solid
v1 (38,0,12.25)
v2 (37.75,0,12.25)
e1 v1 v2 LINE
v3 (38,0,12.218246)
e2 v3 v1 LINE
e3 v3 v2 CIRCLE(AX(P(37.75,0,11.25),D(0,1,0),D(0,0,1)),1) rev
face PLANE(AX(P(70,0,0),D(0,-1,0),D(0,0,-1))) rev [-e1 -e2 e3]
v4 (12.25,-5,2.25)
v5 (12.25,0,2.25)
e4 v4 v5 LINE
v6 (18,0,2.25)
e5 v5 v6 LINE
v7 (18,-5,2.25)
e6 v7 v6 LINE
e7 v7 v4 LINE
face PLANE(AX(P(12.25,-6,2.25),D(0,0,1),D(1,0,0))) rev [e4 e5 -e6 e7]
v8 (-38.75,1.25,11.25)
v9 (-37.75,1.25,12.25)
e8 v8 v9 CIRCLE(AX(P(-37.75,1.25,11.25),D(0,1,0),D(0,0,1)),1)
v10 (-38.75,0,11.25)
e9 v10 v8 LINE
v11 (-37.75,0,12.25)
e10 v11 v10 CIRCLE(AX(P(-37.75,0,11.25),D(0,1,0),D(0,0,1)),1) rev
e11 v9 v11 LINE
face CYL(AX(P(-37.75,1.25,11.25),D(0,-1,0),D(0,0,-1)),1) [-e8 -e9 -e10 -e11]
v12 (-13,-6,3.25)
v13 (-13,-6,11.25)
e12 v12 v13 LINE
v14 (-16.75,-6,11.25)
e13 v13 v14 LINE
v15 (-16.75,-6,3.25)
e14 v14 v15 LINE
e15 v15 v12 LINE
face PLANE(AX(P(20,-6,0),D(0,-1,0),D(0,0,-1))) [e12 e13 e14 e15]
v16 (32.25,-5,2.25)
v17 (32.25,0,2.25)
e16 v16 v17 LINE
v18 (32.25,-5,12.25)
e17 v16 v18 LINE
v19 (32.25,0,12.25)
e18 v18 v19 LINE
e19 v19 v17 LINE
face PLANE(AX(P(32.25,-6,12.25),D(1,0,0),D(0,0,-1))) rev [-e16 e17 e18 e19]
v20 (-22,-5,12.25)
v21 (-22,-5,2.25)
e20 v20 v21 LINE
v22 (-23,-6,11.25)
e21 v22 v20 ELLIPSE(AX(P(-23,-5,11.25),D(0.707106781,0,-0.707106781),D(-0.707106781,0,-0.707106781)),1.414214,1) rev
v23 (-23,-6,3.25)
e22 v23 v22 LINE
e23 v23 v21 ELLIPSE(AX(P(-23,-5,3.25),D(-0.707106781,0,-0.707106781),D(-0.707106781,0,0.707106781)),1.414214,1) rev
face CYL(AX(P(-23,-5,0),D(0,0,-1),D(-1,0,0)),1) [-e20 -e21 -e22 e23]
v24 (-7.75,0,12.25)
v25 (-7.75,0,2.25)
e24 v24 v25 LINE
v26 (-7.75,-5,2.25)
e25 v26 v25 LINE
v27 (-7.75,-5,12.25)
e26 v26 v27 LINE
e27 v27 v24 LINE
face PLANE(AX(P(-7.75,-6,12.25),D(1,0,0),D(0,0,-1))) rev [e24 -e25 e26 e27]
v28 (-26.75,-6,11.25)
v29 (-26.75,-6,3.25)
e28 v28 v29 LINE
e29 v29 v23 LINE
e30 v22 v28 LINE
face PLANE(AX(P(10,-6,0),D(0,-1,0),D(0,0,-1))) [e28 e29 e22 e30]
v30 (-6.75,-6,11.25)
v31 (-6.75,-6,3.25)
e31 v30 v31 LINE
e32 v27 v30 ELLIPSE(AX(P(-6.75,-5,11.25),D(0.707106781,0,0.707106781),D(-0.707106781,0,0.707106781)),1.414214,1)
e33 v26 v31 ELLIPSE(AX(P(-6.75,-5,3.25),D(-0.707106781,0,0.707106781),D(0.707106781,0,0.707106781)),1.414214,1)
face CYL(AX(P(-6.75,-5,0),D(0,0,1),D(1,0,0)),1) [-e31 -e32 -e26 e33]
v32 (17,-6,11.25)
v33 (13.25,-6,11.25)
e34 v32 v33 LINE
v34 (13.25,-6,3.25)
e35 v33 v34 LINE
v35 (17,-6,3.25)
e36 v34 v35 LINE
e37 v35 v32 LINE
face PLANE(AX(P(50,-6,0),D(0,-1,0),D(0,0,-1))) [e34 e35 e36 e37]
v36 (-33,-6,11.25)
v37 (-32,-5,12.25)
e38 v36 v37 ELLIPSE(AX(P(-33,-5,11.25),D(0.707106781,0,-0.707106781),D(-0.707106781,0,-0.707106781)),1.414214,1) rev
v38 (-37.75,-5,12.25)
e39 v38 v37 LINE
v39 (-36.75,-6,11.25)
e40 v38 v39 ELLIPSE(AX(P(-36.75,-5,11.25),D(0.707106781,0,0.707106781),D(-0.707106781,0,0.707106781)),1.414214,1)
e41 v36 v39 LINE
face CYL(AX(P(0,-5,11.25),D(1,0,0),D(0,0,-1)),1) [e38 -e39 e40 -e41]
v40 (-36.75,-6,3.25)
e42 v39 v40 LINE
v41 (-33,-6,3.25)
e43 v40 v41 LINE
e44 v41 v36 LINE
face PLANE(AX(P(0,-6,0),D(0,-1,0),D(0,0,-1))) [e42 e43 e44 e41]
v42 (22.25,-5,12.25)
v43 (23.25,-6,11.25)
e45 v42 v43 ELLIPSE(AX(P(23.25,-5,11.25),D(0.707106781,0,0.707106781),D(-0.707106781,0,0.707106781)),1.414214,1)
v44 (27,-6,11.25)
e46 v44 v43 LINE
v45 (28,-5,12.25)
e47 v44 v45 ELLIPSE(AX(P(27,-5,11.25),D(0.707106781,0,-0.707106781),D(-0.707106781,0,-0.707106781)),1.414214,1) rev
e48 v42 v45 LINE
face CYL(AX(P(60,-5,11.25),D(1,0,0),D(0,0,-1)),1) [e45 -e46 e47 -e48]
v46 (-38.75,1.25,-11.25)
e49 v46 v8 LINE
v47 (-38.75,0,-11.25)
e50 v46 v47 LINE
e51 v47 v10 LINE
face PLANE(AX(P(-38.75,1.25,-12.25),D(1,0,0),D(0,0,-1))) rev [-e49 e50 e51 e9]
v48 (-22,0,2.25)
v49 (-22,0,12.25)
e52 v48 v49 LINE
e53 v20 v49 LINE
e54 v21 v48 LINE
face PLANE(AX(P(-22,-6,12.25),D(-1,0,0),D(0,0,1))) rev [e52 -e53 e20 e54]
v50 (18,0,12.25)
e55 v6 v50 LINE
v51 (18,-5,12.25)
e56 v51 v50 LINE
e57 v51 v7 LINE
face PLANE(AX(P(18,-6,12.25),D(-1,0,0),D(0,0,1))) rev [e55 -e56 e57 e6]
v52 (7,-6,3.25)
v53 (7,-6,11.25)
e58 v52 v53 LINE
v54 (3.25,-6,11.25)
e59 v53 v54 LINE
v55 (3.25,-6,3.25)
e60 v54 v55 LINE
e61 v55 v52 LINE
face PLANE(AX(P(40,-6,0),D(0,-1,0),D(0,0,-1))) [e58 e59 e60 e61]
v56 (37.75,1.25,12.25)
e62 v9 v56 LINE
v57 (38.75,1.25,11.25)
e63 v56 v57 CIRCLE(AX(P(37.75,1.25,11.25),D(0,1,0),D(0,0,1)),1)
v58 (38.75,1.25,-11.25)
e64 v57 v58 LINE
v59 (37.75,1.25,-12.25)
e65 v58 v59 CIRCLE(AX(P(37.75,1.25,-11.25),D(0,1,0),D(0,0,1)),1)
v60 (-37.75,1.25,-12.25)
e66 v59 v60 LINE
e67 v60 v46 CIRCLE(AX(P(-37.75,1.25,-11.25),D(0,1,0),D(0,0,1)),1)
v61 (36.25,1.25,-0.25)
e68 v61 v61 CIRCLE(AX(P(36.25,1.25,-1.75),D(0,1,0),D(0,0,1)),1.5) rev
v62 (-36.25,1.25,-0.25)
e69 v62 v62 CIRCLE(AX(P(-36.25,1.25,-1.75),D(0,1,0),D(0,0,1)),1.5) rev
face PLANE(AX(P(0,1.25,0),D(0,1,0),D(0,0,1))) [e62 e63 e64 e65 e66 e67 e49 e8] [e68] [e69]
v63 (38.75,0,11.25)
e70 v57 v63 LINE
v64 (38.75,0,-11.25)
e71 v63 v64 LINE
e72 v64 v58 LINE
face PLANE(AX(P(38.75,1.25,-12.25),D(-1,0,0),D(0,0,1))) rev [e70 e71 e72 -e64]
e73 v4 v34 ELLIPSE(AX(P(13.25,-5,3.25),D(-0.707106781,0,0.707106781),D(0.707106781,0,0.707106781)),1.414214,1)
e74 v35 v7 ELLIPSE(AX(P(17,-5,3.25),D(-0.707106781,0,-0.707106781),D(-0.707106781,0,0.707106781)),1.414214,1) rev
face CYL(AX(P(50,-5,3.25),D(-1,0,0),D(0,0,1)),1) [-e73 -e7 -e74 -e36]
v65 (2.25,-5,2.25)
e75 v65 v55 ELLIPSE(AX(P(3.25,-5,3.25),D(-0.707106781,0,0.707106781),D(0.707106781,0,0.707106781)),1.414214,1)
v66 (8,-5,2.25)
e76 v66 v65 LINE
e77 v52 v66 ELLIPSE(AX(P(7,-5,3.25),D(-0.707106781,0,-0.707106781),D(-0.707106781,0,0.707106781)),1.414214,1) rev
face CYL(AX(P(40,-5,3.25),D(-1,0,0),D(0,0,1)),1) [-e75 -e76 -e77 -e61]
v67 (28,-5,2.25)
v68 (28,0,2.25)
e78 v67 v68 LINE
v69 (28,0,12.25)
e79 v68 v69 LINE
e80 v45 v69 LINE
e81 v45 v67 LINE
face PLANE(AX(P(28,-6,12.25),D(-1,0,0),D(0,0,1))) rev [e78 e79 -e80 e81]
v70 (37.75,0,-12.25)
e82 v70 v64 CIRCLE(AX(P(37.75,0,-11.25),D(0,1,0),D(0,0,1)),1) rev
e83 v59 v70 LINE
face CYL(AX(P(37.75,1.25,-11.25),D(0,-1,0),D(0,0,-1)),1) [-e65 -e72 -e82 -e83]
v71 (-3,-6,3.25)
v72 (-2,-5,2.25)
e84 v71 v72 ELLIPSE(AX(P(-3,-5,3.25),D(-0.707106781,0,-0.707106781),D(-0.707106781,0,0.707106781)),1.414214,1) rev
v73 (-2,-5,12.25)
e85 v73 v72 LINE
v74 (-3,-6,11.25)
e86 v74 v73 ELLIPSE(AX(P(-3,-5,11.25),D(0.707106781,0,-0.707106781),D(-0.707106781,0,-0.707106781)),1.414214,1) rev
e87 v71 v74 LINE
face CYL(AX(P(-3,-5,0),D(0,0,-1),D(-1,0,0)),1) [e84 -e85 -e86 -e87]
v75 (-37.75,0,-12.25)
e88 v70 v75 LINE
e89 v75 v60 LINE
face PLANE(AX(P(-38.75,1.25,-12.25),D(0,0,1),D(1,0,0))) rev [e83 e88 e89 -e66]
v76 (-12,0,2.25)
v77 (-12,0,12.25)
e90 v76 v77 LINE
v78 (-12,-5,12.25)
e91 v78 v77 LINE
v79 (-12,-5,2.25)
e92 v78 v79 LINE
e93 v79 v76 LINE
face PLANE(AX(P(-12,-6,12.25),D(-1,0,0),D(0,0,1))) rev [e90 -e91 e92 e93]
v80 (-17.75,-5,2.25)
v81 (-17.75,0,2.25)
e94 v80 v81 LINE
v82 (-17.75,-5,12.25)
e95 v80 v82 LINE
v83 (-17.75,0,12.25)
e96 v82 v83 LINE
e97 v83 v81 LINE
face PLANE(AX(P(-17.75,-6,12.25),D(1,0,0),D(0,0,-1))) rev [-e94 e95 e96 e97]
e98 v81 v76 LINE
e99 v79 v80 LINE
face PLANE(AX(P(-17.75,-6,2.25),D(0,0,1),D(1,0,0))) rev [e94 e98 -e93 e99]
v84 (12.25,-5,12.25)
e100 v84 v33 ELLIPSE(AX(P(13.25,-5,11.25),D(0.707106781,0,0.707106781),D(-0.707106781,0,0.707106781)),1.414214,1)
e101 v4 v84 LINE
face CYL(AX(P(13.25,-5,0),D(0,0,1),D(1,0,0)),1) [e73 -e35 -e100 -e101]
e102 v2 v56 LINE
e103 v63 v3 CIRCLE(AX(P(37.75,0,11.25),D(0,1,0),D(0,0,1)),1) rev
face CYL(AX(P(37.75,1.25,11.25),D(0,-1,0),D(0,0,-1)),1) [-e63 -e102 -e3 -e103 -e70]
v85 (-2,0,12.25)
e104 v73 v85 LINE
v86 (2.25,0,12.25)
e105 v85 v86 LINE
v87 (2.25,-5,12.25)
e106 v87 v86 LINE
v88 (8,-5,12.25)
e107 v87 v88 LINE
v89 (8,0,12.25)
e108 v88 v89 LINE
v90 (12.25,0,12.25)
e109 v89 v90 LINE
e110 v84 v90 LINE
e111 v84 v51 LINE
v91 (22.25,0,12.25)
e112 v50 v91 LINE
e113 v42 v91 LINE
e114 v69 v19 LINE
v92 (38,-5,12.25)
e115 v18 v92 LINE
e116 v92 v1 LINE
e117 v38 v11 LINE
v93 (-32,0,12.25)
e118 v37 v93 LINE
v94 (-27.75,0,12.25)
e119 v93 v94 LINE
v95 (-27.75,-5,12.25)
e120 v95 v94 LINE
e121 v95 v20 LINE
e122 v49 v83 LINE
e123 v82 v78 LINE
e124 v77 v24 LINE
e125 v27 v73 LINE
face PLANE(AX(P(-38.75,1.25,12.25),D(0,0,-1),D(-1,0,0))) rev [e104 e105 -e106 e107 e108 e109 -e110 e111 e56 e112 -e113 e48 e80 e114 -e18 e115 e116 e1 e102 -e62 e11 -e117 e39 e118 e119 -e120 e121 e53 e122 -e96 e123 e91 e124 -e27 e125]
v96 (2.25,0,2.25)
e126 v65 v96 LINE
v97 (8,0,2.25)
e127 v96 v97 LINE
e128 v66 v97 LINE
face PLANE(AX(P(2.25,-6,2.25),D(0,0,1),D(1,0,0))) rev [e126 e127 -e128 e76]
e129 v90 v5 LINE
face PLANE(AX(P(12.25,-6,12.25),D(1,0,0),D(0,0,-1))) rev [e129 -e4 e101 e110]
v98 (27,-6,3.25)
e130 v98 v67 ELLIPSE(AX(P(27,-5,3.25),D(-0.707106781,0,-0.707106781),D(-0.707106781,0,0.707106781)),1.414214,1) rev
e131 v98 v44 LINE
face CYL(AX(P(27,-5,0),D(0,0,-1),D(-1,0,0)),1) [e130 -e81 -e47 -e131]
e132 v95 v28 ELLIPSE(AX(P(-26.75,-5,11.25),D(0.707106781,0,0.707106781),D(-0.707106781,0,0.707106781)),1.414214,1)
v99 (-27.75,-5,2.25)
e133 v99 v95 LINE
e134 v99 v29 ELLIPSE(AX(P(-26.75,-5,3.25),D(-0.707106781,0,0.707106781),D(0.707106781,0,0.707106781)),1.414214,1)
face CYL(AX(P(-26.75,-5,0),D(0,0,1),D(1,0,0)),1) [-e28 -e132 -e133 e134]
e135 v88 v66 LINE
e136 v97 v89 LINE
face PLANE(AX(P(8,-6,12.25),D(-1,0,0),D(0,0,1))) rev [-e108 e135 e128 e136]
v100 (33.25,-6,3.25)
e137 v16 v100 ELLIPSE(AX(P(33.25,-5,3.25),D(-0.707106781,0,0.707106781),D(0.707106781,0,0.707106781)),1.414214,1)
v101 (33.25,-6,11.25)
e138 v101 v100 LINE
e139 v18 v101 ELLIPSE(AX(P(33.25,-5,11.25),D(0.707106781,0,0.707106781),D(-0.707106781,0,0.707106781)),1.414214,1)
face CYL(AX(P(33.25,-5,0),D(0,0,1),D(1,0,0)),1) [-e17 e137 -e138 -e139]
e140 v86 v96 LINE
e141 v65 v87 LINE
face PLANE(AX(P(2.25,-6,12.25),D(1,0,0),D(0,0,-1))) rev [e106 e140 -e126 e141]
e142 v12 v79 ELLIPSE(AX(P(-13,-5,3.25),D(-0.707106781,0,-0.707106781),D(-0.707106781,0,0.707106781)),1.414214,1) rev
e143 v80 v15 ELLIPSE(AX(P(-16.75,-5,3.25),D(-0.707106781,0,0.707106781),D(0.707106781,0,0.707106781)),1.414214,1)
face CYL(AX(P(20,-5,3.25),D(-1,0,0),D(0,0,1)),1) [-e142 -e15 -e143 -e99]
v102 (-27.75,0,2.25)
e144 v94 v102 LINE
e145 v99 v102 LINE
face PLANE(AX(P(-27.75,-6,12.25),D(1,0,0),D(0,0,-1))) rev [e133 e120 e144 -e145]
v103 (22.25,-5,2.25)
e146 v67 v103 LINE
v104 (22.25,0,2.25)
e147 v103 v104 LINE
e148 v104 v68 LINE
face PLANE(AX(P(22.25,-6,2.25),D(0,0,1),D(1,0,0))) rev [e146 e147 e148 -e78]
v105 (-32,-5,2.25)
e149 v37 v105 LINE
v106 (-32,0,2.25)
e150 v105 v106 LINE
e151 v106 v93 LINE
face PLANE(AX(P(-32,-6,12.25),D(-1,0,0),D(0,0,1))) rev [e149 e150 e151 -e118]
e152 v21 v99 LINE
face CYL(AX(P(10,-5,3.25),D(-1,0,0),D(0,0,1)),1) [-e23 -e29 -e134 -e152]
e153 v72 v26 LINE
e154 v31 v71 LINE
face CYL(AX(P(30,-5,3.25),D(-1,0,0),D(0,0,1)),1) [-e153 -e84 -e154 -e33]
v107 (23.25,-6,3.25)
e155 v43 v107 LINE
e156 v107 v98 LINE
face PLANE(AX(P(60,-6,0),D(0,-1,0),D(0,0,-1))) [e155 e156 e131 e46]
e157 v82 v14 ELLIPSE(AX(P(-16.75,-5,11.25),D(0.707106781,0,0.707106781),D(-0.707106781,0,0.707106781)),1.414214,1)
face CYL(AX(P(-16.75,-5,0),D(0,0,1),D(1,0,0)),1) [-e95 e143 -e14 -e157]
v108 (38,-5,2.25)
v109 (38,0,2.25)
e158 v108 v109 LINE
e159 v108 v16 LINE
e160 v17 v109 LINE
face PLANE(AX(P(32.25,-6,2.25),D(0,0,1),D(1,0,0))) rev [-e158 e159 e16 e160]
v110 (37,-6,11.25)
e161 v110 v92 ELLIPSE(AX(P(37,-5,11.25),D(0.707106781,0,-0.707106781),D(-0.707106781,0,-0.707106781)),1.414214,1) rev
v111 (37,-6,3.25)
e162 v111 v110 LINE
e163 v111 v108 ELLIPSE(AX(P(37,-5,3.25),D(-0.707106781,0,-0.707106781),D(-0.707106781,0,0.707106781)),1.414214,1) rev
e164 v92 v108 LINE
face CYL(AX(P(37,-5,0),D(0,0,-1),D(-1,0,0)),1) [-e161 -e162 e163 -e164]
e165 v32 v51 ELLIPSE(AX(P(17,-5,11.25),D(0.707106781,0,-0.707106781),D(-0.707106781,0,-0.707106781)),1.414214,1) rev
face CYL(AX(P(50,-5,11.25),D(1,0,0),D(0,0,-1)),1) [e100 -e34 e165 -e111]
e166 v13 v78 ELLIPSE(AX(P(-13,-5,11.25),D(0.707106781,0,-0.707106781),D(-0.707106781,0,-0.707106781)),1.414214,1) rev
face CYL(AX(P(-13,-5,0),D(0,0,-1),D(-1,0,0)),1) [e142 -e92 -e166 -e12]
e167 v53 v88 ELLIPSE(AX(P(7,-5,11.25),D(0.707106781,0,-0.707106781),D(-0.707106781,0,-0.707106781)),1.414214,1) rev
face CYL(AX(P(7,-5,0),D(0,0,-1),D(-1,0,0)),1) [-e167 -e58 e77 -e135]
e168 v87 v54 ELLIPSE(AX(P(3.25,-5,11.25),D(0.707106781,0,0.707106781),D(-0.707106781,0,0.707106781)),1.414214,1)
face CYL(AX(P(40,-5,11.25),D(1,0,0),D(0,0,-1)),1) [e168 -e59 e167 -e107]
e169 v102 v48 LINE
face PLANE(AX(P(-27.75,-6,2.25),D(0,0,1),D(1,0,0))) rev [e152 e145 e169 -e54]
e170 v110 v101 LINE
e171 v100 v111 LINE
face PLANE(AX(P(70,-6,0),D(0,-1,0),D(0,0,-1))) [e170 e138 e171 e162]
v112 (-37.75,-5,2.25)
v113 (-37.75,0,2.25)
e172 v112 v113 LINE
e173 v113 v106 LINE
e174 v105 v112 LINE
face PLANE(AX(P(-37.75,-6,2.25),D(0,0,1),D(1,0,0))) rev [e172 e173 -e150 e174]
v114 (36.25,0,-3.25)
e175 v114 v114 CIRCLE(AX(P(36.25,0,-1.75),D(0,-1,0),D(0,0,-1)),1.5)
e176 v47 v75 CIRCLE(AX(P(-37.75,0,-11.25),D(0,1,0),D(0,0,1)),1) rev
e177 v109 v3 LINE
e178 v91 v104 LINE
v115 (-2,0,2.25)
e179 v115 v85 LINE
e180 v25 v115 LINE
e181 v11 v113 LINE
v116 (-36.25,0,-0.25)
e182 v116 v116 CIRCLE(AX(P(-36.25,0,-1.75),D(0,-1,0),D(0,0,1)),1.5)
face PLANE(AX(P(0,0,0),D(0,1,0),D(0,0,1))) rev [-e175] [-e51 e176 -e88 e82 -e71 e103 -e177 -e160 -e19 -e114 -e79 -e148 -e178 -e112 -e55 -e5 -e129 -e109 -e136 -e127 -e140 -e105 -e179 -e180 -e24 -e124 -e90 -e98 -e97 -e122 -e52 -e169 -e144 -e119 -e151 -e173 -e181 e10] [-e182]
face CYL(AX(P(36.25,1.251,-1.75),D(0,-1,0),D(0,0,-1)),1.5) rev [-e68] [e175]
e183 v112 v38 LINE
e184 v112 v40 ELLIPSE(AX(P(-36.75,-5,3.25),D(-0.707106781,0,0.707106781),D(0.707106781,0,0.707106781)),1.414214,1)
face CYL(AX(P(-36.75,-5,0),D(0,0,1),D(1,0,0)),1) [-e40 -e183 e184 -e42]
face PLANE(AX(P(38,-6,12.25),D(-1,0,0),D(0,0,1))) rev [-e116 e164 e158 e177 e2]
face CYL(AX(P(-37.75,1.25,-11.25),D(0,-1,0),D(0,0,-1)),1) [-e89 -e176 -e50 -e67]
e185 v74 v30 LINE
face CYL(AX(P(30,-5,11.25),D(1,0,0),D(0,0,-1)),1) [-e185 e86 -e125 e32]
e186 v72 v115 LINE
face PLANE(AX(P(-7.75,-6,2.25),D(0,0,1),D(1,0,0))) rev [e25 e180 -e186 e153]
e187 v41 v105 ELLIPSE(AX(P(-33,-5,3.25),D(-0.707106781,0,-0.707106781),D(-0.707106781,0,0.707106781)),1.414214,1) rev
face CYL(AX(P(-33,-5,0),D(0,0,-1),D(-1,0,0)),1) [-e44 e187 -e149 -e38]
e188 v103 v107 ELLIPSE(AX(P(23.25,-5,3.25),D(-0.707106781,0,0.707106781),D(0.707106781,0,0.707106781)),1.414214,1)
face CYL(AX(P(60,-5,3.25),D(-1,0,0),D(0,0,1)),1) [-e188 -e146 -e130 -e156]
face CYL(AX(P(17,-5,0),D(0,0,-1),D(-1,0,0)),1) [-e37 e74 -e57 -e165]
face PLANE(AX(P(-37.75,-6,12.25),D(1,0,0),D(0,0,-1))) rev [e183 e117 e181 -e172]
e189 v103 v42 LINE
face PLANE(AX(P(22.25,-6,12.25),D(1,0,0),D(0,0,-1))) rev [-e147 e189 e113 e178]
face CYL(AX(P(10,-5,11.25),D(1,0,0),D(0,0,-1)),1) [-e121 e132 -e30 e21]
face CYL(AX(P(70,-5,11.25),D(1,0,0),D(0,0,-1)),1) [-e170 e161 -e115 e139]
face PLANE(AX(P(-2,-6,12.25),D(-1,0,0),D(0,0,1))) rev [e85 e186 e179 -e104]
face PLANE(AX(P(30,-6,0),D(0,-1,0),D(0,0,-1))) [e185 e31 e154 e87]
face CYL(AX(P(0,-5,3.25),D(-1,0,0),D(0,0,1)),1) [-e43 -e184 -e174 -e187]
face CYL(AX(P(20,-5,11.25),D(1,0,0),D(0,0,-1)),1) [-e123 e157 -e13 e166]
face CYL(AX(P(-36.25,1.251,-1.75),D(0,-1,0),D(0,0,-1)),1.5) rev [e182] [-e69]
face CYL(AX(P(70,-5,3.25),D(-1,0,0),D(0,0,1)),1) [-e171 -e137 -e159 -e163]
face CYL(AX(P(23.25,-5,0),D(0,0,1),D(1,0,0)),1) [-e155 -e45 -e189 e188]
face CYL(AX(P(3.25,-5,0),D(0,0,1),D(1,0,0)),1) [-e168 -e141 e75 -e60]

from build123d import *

# Parameters (mm, degrees)
SKETCH1_W           = 77.5
SKETCH1_H           = 24.5
BOSS_EXTRUDE1_DEPTH = 1.25
FILLET1_R           = 1
CUT_EXTRUDE1_REACH  = 42.659
SKETCH2_R           = 1.5
SKETCH3_W           = 5.75
SKETCH3_H           = 10
BOSS_EXTRUDE2_DEPTH = 6
FILLET2_R           = 1
LPATTERN1_START     = 2.25
LPATTERN1_DEPTH     = 10
LPATTERN1_START_2   = -37.75
LPATTERN1_2_DEPTH   = 76.75


with BuildPart() as part:
    # Sketch1 → Boss-Extrude1 (new body)
    with BuildSketch(Plane(origin=(0, 0, 0), x_dir=(1, 0, 0), z_dir=(0, 1, 0))):
        Rectangle(SKETCH1_W, SKETCH1_H)
    extrude(amount=BOSS_EXTRUDE1_DEPTH)

    # Fillet1
    fillet1_edges = [part.edges().sort_by_distance(p)[0] for p in [
        (38.75, 0.625, 12.25),
        (-38.75, 0.625, 12.25),
        (-38.75, 0.625, -12.25),
        (38.75, 0.625, -12.25),
    ]]
    fillet(fillet1_edges, radius=FILLET1_R)

    # Sketch2 → Cut-Extrude1 (cut, up to next)
    with BuildSketch(Plane.XZ, mode=Mode.PRIVATE) as cut_extrude1_sk1:
        with Locations(Location((36.25, -1.75, 0), (0, 0, 270))):
            Circle(SKETCH2_R)
    cut_extrude1_tool1 = extrude(cut_extrude1_sk1.sketch, amount=-CUT_EXTRUDE1_REACH, mode=Mode.PRIVATE) & part.part
    # Sketch2 → Cut-Extrude1 (cut, up to next)
    with BuildSketch(Plane.XZ, mode=Mode.PRIVATE) as cut_extrude1_sk2:
        with Locations(Location((-36.25, -1.75, 0), (0, 0, 90))):
            Circle(SKETCH2_R)
    cut_extrude1_tool2 = extrude(cut_extrude1_sk2.sketch, amount=-CUT_EXTRUDE1_REACH, mode=Mode.PRIVATE) & part.part
    add(cut_extrude1_tool1.solids().sort_by_distance((36.25, 0, -1.75))[0], mode=Mode.SUBTRACT)
    add(cut_extrude1_tool2.solids().sort_by_distance((-36.25, 0, -1.75))[0], mode=Mode.SUBTRACT)

    # Sketch3 → Boss-Extrude2 (add)
    with BuildSketch(Plane.XZ):
        with Locations((-34.875, 7.25)):
            Rectangle(SKETCH3_W, SKETCH3_H)
    extrude(amount=BOSS_EXTRUDE2_DEPTH)

    # Fillet2
    fillet2_edges = [part.edges().sort_by_distance(p)[0] for p in [
        (-37.75, -6, 7.25),
        (-34.875, -6, 2.25),
        (-32, -6, 7.25),
        (-34.875, -6, 12.25),
    ]]
    fillet(fillet2_edges, radius=FILLET2_R)

    # LPattern1: read off the stored shape, not the designer's step
    # LPattern1 outline → LPattern1 (add)
    with BuildSketch(Plane.XY.offset(LPATTERN1_START)):
        with BuildLine():
            ThreePointArc((-27.75, -5), (-27.457106781, -5.707106781), (-26.75, -6))
            Line((-26.75, -6), (-23, -6))
            ThreePointArc((-23, -6), (-22.292893219, -5.707106781), (-22, -5))
            Line((-22, -5), (-22, 0))
            Line((-22, 0), (-27.75, 0))
            Line((-27.75, 0), (-27.75, -5))
        make_face()
        with BuildLine():
            Line((38, 0), (32.25, 0))
            Line((32.25, 0), (32.25, -5))
            ThreePointArc((32.25, -5), (32.542893219, -5.707106781), (33.25, -6))
            Line((33.25, -6), (37, -6))
            ThreePointArc((37, -6), (37.707106781, -5.707106781), (38, -5))
            Line((38, -5), (38, 0))
        make_face()
        with BuildLine():
            Line((28, 0), (22.25, 0))
            Line((22.25, 0), (22.25, -5))
            ThreePointArc((22.25, -5), (22.542893219, -5.707106781), (23.25, -6))
            Line((23.25, -6), (27, -6))
            ThreePointArc((27, -6), (27.707106781, -5.707106781), (28, -5))
            Line((28, -5), (28, 0))
        make_face()
        with BuildLine():
            Line((18, 0), (12.25, 0))
            Line((12.25, 0), (12.25, -5))
            ThreePointArc((12.25, -5), (12.542893219, -5.707106781), (13.25, -6))
            Line((13.25, -6), (17, -6))
            ThreePointArc((17, -6), (17.707106781, -5.707106781), (18, -5))
            Line((18, -5), (18, 0))
        make_face()
        with BuildLine():
            Line((8, 0), (2.25, 0))
            Line((2.25, 0), (2.25, -5))
            ThreePointArc((2.25, -5), (2.542893219, -5.707106781), (3.25, -6))
            Line((3.25, -6), (7, -6))
            ThreePointArc((7, -6), (7.707106781, -5.707106781), (8, -5))
            Line((8, -5), (8, 0))
        make_face()
        with BuildLine():
            Line((-2, 0), (-7.75, 0))
            Line((-7.75, 0), (-7.75, -5))
            ThreePointArc((-7.75, -5), (-7.457106781, -5.707106781), (-6.75, -6))
            Line((-6.75, -6), (-3, -6))
            ThreePointArc((-3, -6), (-2.292893219, -5.707106781), (-2, -5))
            Line((-2, -5), (-2, 0))
        make_face()
        with BuildLine():
            Line((-12, 0), (-17.75, 0))
            Line((-17.75, 0), (-17.75, -5))
            ThreePointArc((-17.75, -5), (-17.457106781, -5.707106781), (-16.75, -6))
            Line((-16.75, -6), (-13, -6))
            ThreePointArc((-13, -6), (-12.292893219, -5.707106781), (-12, -5))
            Line((-12, -5), (-12, 0))
        make_face()
    extrude(amount=LPATTERN1_DEPTH)

    # LPattern1 2 outline → LPattern1 2 (cut)
    with BuildSketch(Plane.YZ.offset(LPATTERN1_START_2)):
        with BuildLine():
            Line((-6, 2.25), (-5, 2.25))
            ThreePointArc((-5, 2.25), (-5.707106781, 2.542893219), (-6, 3.25))
            Line((-6, 3.25), (-6, 2.25))
        make_face()
        with BuildLine():
            Line((-6, 12.25), (-6, 11.25))
            ThreePointArc((-6, 11.25), (-5.707106781, 11.957106781), (-5, 12.25))
            Line((-5, 12.25), (-6, 12.25))
        make_face()
    extrude(amount=LPATTERN1_2_DEPTH, mode=Mode.SUBTRACT)


solid = part.part
